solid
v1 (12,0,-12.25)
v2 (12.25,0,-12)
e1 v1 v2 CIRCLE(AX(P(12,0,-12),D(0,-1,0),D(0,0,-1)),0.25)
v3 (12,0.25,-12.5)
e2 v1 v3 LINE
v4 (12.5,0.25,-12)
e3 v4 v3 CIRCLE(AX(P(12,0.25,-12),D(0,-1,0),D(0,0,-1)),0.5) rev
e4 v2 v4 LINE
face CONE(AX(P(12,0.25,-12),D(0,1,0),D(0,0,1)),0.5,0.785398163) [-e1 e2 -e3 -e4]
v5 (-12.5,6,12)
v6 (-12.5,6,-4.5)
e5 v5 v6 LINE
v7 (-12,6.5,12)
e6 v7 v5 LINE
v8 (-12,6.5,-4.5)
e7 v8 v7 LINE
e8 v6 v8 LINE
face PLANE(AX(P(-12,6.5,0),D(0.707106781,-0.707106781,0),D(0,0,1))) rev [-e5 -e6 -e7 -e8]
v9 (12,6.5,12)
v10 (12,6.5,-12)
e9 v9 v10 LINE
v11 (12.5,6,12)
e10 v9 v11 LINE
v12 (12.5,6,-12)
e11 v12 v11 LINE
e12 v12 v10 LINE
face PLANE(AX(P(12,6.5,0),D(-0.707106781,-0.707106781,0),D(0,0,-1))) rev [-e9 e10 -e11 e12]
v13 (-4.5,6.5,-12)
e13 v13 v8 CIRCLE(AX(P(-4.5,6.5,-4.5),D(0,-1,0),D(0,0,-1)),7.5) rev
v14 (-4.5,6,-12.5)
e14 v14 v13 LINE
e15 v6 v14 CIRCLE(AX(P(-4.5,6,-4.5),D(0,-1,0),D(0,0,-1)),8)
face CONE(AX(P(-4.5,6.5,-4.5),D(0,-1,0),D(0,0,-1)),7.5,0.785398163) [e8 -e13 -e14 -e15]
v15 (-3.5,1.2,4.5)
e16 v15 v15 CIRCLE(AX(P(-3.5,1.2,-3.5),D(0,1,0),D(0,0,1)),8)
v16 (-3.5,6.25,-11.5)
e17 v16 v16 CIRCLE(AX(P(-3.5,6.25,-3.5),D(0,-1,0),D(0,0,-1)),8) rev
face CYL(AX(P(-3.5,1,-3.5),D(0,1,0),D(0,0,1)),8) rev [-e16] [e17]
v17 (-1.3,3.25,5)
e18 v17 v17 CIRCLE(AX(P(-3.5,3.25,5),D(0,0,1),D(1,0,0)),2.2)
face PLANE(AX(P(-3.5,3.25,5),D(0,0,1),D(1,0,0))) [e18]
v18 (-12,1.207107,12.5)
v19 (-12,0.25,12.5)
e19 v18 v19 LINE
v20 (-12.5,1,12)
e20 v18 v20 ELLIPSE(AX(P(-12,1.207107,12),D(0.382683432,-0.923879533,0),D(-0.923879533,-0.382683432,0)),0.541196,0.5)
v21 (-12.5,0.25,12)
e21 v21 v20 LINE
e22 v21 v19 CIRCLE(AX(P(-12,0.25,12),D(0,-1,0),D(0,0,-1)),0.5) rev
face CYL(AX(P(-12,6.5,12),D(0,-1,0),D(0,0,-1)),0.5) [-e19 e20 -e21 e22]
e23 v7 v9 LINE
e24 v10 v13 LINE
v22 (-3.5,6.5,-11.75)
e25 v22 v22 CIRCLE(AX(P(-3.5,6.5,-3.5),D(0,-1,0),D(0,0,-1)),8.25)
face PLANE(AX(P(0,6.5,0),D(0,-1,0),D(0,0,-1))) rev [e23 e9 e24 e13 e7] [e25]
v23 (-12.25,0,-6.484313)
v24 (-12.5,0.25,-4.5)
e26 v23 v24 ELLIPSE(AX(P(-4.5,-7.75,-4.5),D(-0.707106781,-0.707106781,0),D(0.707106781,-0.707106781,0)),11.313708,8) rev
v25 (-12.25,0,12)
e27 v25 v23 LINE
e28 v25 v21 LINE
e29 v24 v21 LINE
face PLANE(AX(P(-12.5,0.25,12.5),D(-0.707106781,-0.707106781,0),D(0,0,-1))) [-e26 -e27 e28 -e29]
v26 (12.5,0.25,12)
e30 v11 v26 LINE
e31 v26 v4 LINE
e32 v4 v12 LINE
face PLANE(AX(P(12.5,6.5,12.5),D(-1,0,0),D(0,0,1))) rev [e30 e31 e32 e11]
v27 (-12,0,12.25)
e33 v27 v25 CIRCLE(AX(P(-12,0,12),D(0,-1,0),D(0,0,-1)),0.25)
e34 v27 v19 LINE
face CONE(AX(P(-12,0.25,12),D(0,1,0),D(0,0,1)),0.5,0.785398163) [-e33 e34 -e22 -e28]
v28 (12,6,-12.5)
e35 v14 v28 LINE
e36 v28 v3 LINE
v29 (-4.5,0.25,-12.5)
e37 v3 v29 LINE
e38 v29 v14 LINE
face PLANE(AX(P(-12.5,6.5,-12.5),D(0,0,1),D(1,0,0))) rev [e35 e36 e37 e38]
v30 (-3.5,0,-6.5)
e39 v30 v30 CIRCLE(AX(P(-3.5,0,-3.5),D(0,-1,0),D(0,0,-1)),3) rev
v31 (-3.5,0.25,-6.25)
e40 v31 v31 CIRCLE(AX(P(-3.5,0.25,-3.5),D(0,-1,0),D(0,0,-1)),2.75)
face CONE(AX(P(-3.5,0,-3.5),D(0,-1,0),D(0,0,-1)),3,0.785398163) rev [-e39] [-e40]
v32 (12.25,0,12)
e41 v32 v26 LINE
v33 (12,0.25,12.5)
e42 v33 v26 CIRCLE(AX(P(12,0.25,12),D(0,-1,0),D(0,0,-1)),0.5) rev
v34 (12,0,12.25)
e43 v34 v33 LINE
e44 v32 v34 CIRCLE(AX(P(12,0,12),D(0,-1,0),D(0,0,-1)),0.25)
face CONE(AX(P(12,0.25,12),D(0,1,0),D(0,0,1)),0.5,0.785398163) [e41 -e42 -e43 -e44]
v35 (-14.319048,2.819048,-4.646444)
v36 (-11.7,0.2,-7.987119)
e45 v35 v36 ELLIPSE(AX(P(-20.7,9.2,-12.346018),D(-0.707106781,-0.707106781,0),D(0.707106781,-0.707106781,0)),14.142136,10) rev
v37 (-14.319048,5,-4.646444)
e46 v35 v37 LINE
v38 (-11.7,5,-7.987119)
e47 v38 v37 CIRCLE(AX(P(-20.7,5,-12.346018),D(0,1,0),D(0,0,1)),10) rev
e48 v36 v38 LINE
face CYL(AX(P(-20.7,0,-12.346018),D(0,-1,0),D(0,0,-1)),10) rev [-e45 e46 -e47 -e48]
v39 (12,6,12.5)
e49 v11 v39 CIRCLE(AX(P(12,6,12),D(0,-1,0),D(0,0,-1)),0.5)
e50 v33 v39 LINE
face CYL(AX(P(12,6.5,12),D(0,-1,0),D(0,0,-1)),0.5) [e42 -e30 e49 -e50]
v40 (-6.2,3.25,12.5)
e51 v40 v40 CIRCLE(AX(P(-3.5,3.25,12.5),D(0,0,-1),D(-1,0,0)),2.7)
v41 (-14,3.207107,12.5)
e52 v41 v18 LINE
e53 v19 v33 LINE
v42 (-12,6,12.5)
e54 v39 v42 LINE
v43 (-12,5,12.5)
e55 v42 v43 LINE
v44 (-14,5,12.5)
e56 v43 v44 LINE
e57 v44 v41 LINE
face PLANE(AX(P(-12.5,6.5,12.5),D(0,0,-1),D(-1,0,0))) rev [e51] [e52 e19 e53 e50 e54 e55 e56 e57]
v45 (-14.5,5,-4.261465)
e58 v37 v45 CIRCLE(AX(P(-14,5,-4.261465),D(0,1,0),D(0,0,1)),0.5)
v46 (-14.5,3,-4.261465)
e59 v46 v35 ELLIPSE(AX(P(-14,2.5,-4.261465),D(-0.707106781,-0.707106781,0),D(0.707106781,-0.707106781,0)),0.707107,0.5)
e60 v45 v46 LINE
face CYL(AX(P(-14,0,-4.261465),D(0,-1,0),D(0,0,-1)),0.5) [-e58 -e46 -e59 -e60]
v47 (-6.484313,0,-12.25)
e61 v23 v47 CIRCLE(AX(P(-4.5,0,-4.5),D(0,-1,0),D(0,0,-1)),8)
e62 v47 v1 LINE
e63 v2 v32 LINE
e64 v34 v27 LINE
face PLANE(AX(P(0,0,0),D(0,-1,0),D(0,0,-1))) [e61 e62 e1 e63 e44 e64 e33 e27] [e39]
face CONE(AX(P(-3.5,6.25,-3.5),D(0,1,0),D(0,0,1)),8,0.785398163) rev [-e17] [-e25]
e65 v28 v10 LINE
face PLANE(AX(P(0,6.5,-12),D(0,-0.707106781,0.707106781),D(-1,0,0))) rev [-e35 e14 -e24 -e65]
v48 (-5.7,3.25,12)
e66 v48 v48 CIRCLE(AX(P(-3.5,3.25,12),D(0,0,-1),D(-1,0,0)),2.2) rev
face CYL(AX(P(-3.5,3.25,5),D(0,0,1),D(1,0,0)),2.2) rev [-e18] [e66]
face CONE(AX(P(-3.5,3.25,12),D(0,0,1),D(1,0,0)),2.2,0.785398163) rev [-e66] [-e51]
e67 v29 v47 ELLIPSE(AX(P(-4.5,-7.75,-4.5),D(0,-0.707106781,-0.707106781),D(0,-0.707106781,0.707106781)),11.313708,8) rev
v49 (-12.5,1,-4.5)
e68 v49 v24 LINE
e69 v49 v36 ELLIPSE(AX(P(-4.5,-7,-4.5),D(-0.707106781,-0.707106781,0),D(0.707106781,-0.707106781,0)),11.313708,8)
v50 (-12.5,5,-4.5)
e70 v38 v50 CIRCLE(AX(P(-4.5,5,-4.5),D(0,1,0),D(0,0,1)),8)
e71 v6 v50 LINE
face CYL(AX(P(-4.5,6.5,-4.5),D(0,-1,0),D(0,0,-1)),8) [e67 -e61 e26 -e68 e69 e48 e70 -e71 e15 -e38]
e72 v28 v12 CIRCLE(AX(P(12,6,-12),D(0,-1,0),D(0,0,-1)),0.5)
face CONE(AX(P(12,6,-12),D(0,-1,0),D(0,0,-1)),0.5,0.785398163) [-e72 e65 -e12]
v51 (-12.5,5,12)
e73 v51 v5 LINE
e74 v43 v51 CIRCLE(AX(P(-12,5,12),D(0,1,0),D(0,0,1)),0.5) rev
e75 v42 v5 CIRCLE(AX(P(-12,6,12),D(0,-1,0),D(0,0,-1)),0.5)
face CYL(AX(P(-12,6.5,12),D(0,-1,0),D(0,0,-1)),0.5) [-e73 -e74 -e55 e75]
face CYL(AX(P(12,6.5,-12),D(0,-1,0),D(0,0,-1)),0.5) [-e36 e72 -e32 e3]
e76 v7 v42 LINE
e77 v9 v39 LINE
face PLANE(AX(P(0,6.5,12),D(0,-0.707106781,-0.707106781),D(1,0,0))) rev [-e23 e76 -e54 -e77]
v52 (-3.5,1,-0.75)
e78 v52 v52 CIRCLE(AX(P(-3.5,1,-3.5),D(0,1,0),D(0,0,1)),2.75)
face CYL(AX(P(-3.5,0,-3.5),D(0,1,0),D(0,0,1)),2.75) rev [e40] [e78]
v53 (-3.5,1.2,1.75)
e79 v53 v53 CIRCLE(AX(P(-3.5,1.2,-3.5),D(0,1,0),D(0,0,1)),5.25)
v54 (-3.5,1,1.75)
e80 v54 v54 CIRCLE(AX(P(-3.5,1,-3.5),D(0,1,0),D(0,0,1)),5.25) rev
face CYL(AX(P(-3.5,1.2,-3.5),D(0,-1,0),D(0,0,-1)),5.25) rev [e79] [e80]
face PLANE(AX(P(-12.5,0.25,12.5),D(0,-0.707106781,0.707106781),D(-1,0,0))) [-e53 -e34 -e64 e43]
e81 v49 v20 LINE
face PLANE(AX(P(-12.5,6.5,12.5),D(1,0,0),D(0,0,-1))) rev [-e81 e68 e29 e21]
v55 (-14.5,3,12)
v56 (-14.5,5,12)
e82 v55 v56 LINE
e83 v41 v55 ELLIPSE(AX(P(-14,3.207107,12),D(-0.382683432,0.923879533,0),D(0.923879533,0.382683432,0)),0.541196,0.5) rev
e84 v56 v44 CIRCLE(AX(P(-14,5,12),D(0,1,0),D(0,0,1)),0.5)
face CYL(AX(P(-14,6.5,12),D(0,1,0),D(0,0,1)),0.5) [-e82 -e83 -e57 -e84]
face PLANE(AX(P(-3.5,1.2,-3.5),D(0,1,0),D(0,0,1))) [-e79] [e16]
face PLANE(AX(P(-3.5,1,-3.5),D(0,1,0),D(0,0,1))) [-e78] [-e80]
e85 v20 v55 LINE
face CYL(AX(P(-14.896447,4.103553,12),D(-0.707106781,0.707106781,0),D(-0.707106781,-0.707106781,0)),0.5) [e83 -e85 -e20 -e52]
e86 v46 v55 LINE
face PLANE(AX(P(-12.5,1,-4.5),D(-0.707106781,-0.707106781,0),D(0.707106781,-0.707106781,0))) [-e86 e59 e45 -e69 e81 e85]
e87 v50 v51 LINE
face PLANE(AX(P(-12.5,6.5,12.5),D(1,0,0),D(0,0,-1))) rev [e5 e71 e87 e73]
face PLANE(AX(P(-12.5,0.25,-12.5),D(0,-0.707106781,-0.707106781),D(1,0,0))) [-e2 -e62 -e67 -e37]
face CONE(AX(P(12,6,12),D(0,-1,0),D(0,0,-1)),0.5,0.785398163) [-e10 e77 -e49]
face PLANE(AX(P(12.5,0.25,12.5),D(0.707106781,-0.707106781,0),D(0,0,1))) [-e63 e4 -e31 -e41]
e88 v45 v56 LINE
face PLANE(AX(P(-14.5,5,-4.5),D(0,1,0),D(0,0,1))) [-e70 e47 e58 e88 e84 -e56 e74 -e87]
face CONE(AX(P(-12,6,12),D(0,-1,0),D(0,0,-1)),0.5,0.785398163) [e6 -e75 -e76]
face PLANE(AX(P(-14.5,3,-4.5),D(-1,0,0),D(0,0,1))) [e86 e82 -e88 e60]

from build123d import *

# Parameters (mm, degrees)
SKETCH1_W           = 25
SKETCH1_H           = 25
BOSS_EXTRUDE1_DEPTH = 6.5
SKETCH2_R           = 8
CUT_EXTRUDE1_DEPTH  = 5.5
FILLET1_R           = 8
SKETCH4_R           = 2.2
CUT_EXTRUDE2_DEPTH  = 7.5
BOSS_EXTRUDE2_DEPTH = 17
FILLET2_R           = 10
SKETCH6_R           = 2.75
CUT_EXTRUDE3_DEPTH  = 20.918584287
BOSS_EXTRUDE3_START = 0.2
SKETCH7_R           = 8
SKETCH7_R_2         = 5.25
BOSS_EXTRUDE3_DEPTH = 0.2
FILLET3_R           = 0.5
CHAMFER1_SIZE       = 0.5
CHAMFER7_SIZE       = 0.25


# Some blends are built 0.0001 mm under size
with BuildPart() as part:
    # Sketch1 → Boss-Extrude1 (new body)
    with BuildSketch(Plane(origin=(0, 0, 0), x_dir=(1, 0, 0), z_dir=(0, 1, 0))):
        Rectangle(SKETCH1_W, SKETCH1_H)
    extrude(amount=BOSS_EXTRUDE1_DEPTH)

    # Sketch2 → Cut-Extrude1 (cut)
    with BuildSketch(Plane(origin=(0, 6.5, 0), x_dir=(1, 0, 0), z_dir=(0, 1, 0))):
        with Locations(Location((-3.5, 3.5, 0), (0, 0, 270))):
            Circle(SKETCH2_R)
    extrude(amount=-CUT_EXTRUDE1_DEPTH, mode=Mode.SUBTRACT)

    # Fillet1
    fillet1_edges = [part.edges().sort_by_distance(p)[0] for p in [
        (-12.5, 3.25, -12.5),
    ]]
    fillet(fillet1_edges, radius=FILLET1_R)

    # Sketch4 → Cut-Extrude2 (cut)
    with BuildSketch(Plane.XY.offset(12.5)):
        with Locations((-3.5, 3.25)):
            Circle(SKETCH4_R)
    extrude(amount=-CUT_EXTRUDE2_DEPTH, mode=Mode.SUBTRACT)

    # Sketch5 → Boss-Extrude2 (add)
    with BuildSketch(Plane.XY.offset(12.5)):
        Polygon((-12.5, 1), (-14.5, 3), (-14.5, 5), (-12.5, 5), align=None)
    extrude(amount=-BOSS_EXTRUDE2_DEPTH)

    # Fillet2
    # the kernel refuses this fillet: 10 mm, written as the material it adds along each edge
    with BuildSketch(Plane(origin=(-12.5, 5, -4.5), x_dir=(0.22360679774997813, 0, -0.9746794344808967), z_dir=(0, -1, 0))) as fillet2_piece_1_section:
        with BuildLine():
            CenterArc((5.813776741, -9.746794345), FILLET2_R, 102.920966382, 25.841932763)
            Line((-0.447213595, -1.949358869), (-0.572433402, -1.793410159))
            ThreePointArc((-0.572433402, -1.793410159), (-0.418542685, -0.929958075), (-0.194935887, 0.04472136))
            Line((-0.194935887, 0.04472136), (0.04472136, 0.194935887))
            ThreePointArc((0.04472136, 0.194935887), (1.788854382, -0.002564524), (3.532987404, 0.194935887))
            Line((3.532987404, 0.194935887), (3.577708764, 0))
        make_face()
    fillet2_piece_1 = extrude(amount=12.94427191, mode=Mode.PRIVATE)
    fillet2_piece_1 = split(fillet2_piece_1, bisect_by=Plane(origin=(-14.5, 3, -4.5), z_dir=(0.7071067811865512, 0.7071067811865438, 0)), keep=Keep.TOP, mode=Mode.PRIVATE)
    add(fillet2_piece_1)

    # Sketch6 → Cut-Extrude3 (cut, through all)
    with BuildSketch(Plane(origin=(0, 1, 0), x_dir=(1, 0, 0), z_dir=(0, 1, 0))):
        with Locations(Location((-3.5, 3.5, 0), (0, 0, 270))):
            Circle(SKETCH6_R)
    extrude(amount=-CUT_EXTRUDE3_DEPTH, mode=Mode.SUBTRACT)

    # Sketch7 → Boss-Extrude3 (add)
    with BuildSketch(Plane(origin=(0, 1, 0), x_dir=(1, 0, 0), z_dir=(0, 1, 0)).offset(BOSS_EXTRUDE3_START)):
        with Locations(Location((-3.5, 3.5, 0), (0, 0, 270))):
            Circle(SKETCH7_R)
        with Locations(Location((-3.5, 3.5, 0), (0, 0, 270))):
            Circle(SKETCH7_R_2, mode=Mode.SUBTRACT)
    extrude(amount=-BOSS_EXTRUDE3_DEPTH)

    # Fillet3
    fillet3_edges = [part.edges().sort_by_distance(p)[0] for p in [
        (-14.5, 4, -4.5),
        (-12.5, 0.5, 12.5),
        (-13.5, 2, 12.5),
        (-14.5, 4, 12.5),
        (-12.5, 5.75, 12.5),
        (12.5, 3.25, -12.5),
        (12.5, 3.25, 12.5),
    ]]
    fillet(fillet3_edges, radius=FILLET3_R)

    # Chamfer1
    chamfer1_edges = [part.edges().sort_by_distance(p)[0] for p in [
        (0, 6.5, 12.5),
        (3.75, 6.5, -12.5),
        (12.5, 6.5, 0),
        (12.353553391, 6.5, 12.353553391),
        (12.353553391, 6.5, -12.353553391),
        (-12.353553391, 6.5, 12.353553391),
        (-12.5, 6.5, 3.75),
        (-10.156854249, 6.5, -10.156854249),
        (-5.7, 3.25, 12.5),
    ]]
    chamfer(chamfer1_edges, length=CHAMFER1_SIZE - 0.0001)  # a hair under: the kernel refuses the full size

    # Chamfer7
    # the kernel refuses this chamfer: 0.25 mm, written as the material it takes off along each edge
    with BuildSketch(Plane(origin=(-3.5, 0, -3.5), x_dir=(0, 0, 1), z_dir=(-1, 0, 0))) as chamfer7_piece_1:
        Polygon((2.75 + CHAMFER7_SIZE, 0), (2.75, CHAMFER7_SIZE), (2.75, 0), align=None)
    revolve(axis=Axis((-3.5, 0, -3.5), (0, 1, 0)), mode=Mode.SUBTRACT)
    with BuildSketch(Plane(origin=(-12.5, 0, -7.714603735), x_dir=(1, 0, 0), z_dir=(0, 0, 1)), Plane(origin=(12, 0, -12.5), x_dir=(0, 0, 1), z_dir=(-1, 0, 0))) as chamfer7_piece_2:
        Polygon((CHAMFER7_SIZE, 0), (0, CHAMFER7_SIZE), (0, 0), align=None)
    extrude(amount=19.714603735, mode=Mode.SUBTRACT)
    with BuildSketch(Plane(origin=(-12, 0, 12.5), x_dir=(0, 1, 0), z_dir=(1, 0, 0))) as chamfer7_piece_3:
        Polygon((CHAMFER7_SIZE, 0), (0, -CHAMFER7_SIZE), (0, 0), align=None)
    extrude(amount=24, mode=Mode.SUBTRACT)
    with BuildSketch(Plane(origin=(12.5, 0, 12), x_dir=(-1, 0, 0), z_dir=(0, 0, -1))) as chamfer7_piece_4:
        Polygon((CHAMFER7_SIZE, 0), (0, CHAMFER7_SIZE), (0, 0), align=None)
    extrude(amount=24, mode=Mode.SUBTRACT)
    with BuildSketch(Plane(origin=(-3.5, 6.5, -3.5), x_dir=(0, 0, 1), z_dir=(-1, 0, 0))) as chamfer7_piece_5:
        Polygon((8 + CHAMFER7_SIZE, 0), (8, -CHAMFER7_SIZE), (8, 0), align=None)
    revolve(axis=Axis((-3.5, 6.5, -3.5), (0, 1, 0)), mode=Mode.SUBTRACT)
    with BuildSketch(Plane(origin=(12, 0, -12), x_dir=(0, 0, -1), z_dir=(-1, 0, 0))) as chamfer7_piece_6:
        Polygon((0.5 - CHAMFER7_SIZE, 0), (0.5, -CHAMFER7_SIZE), (0.5, 0), align=None)
    revolve(axis=Axis((12, 0, -12), (0, -1, 0)), revolution_arc=90, mode=Mode.SUBTRACT)
    with BuildSketch(Plane(origin=(12, 0, 12), x_dir=(0, 0, 1), z_dir=(-1, 0, 0))) as chamfer7_piece_7:
        Polygon((0.5, CHAMFER7_SIZE), (0.5 - CHAMFER7_SIZE, 0), (0.5, 0), align=None)
    revolve(axis=Axis((12, 0, 12), (0, 1, 0)), revolution_arc=90, mode=Mode.SUBTRACT)
    with BuildSketch(Plane(origin=(-12, 0, 12), x_dir=(0, 0, 1), z_dir=(1, 0, 0))) as chamfer7_piece_8:
        Polygon((0.5 - CHAMFER7_SIZE, 0), (0.5, -CHAMFER7_SIZE), (0.5, 0), align=None)
    revolve(axis=Axis((-12, 0, 12), (0, -1, 0)), revolution_arc=90, mode=Mode.SUBTRACT)


solid = part.part
